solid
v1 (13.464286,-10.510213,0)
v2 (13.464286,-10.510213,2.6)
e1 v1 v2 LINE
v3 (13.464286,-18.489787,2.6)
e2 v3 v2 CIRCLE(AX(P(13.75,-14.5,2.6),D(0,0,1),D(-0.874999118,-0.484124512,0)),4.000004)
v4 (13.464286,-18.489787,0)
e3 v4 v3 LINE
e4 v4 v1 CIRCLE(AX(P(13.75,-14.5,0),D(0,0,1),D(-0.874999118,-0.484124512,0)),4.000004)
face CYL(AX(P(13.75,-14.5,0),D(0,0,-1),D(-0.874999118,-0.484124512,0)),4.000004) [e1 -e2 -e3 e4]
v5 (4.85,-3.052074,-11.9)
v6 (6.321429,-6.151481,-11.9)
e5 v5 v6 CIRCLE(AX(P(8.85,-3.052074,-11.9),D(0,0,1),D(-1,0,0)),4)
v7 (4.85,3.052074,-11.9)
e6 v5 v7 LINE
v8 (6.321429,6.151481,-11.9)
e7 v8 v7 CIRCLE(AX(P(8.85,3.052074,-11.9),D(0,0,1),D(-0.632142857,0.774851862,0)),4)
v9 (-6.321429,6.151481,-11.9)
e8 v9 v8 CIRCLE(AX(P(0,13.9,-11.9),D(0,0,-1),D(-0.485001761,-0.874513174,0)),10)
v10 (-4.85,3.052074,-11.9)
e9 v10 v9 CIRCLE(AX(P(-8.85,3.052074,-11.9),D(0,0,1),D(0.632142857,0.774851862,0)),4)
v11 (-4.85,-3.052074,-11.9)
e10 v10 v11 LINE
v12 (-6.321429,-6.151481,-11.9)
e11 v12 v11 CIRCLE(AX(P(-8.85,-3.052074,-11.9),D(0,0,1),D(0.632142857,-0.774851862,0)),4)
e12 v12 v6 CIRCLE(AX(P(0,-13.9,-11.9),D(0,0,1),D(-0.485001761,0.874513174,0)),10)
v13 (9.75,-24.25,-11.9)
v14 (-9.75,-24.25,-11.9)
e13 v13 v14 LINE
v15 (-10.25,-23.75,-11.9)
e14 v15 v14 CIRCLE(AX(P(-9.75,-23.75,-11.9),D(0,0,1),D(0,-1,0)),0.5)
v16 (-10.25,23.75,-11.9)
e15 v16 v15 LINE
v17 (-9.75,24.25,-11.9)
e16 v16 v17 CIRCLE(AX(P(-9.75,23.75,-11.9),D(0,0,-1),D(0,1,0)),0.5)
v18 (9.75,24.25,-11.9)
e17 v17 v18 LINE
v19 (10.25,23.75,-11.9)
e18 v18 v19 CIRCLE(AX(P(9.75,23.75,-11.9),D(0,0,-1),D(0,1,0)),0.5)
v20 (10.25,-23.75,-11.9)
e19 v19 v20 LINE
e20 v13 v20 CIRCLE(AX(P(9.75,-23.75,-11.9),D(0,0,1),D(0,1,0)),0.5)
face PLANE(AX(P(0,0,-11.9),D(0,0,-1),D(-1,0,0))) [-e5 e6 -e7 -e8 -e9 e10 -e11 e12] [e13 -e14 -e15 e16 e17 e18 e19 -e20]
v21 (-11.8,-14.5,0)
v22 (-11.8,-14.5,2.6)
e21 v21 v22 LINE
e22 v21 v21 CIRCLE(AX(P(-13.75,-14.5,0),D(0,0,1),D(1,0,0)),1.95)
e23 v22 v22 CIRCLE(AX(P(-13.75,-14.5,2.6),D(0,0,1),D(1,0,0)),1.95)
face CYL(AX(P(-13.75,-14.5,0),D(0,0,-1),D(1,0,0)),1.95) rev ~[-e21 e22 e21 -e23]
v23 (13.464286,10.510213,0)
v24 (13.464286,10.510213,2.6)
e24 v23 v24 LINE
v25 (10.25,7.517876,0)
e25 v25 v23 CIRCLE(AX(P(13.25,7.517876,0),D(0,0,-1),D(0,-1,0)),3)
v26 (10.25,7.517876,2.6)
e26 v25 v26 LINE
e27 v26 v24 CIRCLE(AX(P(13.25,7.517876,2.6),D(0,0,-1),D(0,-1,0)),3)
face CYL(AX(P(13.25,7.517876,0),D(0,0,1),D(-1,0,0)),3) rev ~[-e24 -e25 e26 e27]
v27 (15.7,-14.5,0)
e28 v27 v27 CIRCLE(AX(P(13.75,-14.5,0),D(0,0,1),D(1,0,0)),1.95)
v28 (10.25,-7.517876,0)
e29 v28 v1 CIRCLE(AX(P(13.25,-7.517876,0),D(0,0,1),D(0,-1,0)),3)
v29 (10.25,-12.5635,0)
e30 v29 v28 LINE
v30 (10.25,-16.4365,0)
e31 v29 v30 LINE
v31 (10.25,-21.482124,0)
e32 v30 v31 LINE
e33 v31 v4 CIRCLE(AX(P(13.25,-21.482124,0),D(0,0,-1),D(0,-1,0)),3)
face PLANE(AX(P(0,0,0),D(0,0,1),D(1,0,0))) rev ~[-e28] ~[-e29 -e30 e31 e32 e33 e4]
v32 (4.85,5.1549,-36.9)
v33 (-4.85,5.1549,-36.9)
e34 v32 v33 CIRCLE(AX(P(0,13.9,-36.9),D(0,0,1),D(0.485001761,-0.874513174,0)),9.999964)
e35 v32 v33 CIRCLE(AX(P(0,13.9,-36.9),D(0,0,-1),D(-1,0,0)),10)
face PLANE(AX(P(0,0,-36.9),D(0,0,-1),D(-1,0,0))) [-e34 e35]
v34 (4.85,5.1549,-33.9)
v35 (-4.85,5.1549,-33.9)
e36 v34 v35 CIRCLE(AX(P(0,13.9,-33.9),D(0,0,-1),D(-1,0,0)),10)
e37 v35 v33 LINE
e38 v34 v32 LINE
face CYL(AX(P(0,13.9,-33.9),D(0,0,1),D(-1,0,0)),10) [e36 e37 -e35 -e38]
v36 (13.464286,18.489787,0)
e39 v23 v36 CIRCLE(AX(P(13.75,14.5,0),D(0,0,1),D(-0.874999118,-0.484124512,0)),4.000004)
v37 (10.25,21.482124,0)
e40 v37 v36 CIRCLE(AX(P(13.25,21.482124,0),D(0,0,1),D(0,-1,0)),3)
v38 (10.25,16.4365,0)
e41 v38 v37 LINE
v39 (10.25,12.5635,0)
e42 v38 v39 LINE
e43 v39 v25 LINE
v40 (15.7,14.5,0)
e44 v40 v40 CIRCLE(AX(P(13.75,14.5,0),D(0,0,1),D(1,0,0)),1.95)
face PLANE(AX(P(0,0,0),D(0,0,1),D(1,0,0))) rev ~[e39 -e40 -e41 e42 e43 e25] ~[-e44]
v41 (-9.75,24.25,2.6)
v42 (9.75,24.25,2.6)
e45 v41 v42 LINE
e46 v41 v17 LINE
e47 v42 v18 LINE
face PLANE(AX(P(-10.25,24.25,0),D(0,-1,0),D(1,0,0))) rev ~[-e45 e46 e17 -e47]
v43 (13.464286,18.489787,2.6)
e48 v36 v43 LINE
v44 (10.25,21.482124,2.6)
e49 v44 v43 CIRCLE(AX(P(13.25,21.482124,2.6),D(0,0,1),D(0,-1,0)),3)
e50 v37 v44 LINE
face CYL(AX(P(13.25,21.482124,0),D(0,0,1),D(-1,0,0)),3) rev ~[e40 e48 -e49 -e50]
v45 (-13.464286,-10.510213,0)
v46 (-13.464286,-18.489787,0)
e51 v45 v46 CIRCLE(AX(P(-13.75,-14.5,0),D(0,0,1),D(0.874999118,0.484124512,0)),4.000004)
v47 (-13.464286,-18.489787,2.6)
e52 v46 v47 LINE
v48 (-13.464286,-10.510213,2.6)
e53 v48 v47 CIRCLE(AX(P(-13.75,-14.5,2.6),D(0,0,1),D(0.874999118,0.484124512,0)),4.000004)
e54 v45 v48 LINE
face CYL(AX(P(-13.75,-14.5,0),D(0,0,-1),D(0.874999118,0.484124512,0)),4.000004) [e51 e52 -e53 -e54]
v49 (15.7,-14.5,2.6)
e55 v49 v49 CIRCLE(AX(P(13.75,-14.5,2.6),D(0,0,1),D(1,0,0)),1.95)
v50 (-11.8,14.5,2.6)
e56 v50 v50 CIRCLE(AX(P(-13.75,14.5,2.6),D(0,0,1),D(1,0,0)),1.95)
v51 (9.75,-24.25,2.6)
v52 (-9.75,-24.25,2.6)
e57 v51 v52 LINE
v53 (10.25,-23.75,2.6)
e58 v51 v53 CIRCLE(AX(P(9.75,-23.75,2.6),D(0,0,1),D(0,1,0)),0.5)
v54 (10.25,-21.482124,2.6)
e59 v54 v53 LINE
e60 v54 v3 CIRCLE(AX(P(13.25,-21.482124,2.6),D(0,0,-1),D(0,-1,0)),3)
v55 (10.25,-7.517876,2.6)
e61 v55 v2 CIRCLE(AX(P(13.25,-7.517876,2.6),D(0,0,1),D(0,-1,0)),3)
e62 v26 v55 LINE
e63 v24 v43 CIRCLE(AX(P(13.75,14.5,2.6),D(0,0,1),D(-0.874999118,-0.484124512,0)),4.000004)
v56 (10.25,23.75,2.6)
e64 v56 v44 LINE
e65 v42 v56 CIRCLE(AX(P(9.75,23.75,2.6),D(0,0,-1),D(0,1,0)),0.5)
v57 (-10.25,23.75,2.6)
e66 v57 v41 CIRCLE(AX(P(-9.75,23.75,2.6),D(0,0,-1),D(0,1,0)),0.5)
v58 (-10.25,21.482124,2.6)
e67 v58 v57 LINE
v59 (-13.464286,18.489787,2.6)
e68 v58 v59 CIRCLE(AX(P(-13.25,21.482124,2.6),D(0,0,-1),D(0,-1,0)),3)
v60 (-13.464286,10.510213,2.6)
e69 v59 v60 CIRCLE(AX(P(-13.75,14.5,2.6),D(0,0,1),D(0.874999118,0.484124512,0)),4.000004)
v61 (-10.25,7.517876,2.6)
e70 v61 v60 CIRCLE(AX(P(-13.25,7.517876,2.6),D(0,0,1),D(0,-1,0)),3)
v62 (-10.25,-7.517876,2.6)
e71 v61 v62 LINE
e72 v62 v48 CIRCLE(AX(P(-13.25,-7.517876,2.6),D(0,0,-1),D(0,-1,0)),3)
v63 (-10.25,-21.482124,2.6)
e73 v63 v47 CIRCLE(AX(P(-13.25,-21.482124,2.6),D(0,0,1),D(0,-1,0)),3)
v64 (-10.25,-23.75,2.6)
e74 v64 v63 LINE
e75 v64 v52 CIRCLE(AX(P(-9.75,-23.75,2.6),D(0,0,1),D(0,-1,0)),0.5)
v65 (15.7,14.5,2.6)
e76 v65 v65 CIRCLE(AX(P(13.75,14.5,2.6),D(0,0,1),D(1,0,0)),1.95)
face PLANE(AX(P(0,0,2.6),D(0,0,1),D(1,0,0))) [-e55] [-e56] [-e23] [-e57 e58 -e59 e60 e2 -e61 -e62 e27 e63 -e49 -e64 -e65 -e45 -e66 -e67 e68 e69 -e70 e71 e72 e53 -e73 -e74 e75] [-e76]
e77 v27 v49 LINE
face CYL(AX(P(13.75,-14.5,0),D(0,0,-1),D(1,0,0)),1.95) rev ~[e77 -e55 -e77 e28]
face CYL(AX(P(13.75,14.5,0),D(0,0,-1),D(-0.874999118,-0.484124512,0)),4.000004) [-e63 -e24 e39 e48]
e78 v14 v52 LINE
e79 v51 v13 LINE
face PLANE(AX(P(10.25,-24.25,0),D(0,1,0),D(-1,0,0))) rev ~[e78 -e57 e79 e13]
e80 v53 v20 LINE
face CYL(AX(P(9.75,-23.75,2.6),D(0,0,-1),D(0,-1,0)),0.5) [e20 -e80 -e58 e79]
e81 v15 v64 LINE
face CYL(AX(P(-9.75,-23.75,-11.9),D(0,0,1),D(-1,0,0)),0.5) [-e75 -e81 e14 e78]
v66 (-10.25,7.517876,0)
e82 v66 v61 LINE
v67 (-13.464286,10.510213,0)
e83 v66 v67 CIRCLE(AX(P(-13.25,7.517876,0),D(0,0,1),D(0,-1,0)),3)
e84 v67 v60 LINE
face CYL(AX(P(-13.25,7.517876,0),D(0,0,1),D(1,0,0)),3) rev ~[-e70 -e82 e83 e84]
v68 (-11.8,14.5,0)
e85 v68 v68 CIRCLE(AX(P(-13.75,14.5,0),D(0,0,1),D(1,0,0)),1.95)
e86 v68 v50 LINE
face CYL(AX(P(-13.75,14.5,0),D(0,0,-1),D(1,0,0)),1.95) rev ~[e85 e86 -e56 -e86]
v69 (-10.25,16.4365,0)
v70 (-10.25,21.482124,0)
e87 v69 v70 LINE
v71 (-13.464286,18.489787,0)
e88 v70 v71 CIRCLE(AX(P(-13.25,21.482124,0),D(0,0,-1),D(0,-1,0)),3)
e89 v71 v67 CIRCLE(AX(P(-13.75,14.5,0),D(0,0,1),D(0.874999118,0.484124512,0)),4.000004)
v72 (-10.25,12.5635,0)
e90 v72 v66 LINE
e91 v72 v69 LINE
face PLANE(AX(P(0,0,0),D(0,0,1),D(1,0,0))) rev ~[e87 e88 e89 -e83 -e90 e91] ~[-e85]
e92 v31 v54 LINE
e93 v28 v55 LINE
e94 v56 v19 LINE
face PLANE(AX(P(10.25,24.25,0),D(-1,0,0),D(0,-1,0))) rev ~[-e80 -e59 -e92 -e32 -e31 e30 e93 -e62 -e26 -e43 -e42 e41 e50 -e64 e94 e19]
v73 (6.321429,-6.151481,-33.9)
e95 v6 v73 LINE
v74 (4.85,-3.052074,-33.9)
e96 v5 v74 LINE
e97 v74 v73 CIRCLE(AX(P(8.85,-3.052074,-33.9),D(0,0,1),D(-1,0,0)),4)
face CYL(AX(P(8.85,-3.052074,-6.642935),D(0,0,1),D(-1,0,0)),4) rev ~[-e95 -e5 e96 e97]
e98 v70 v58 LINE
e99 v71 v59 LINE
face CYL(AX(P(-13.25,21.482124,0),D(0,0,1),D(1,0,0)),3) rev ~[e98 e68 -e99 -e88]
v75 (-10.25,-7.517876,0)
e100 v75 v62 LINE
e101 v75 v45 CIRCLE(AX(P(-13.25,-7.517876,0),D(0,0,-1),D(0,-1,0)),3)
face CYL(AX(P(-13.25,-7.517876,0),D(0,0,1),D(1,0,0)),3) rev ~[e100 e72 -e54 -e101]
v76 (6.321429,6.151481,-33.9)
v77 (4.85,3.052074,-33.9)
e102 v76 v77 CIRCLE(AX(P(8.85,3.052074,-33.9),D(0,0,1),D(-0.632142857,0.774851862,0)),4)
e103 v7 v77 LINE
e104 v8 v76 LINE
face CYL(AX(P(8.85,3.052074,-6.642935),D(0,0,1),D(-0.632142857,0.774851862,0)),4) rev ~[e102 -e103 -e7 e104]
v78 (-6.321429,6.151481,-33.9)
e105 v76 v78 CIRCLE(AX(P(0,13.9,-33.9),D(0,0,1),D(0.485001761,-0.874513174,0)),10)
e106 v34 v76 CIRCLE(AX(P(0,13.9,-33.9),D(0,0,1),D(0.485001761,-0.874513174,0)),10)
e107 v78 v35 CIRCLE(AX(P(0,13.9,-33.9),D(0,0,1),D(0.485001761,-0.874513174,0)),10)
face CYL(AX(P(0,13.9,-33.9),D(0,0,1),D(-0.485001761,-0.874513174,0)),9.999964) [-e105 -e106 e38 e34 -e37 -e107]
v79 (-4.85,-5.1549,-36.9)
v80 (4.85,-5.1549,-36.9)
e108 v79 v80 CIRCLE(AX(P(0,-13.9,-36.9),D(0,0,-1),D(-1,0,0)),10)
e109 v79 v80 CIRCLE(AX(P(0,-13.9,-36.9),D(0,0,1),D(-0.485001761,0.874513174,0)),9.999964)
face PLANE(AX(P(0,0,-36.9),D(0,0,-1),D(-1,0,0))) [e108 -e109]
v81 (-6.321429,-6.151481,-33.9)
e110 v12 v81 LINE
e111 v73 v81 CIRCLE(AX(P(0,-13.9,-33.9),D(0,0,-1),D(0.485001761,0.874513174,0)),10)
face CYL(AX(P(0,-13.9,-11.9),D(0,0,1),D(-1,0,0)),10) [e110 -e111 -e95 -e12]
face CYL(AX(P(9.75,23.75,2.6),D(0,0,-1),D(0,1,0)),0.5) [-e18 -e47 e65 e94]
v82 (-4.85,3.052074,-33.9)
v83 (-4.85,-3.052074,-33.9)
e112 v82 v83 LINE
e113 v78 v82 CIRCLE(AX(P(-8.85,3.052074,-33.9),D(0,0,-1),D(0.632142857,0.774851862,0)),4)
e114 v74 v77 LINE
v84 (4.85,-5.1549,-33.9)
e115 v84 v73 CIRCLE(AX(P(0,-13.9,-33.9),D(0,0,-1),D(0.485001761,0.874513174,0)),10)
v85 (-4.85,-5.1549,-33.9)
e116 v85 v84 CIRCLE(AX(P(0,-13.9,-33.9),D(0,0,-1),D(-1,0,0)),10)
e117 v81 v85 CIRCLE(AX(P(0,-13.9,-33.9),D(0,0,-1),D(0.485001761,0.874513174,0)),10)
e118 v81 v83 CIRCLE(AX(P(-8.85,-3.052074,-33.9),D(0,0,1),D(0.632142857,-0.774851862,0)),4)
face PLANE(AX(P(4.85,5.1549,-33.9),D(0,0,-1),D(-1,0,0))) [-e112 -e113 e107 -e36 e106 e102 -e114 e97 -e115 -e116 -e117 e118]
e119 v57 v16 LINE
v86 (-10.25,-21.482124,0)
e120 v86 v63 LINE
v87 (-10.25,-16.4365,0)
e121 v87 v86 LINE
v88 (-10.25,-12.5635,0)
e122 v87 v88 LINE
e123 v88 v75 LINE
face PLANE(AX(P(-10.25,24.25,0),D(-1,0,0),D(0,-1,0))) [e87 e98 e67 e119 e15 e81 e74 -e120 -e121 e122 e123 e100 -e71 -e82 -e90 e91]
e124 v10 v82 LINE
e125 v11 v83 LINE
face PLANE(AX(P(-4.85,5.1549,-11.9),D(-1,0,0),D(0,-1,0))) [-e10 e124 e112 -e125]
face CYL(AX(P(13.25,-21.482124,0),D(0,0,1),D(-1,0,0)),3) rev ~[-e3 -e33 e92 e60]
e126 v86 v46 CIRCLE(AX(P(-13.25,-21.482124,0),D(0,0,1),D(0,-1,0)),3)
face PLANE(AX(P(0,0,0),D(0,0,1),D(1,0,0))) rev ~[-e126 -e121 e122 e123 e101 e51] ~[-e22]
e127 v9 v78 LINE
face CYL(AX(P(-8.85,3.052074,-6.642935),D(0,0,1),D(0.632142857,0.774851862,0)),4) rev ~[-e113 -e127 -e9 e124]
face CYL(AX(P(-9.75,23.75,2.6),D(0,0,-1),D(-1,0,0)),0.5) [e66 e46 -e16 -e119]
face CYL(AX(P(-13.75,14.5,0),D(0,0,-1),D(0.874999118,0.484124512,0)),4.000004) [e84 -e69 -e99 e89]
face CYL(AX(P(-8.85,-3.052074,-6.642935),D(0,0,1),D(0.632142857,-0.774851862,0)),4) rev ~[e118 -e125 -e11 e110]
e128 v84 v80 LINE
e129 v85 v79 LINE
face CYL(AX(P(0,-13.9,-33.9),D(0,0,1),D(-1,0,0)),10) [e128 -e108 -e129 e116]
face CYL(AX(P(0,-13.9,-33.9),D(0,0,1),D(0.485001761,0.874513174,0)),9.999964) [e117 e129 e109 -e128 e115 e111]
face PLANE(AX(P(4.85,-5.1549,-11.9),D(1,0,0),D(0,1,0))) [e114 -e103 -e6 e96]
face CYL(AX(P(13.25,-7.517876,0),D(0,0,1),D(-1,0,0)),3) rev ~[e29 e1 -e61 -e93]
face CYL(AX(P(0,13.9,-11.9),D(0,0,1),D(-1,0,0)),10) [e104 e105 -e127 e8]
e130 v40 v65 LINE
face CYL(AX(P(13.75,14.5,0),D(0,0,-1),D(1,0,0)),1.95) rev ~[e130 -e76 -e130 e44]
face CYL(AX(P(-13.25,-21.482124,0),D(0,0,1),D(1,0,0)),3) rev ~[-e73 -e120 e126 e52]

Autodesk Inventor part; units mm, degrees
ref_plane "YZ Plane" through (0, 0, 0) normal (1, 0, 0) x (0, 1, 0)
ref_plane "XZ Plane" through (0, 0, 0) normal (0, 1, 0) x (-1, 0, 0)
ref_plane "XY Plane" through (0, 0, 0) normal (0, 0, 1) x (1, 0, 0)
sketch "Sketch1" plane through (0, 0, 0) normal (0, 0, 1) x (1, 0, 0)
  line L0 (10.25, 24.25) -> (10.25, -24.25) projected
  line L1 (-10.25, 24.25) -> (10.25, 24.25) projected
  line L2 (-10.25, -24.25) -> (-10.25, -9) projected
  line L3 (-10.25, 9) -> (-10.25, 24.25) projected
  line L4 (10.25, -24.25) -> (-10.25, -24.25) projected
  circle A0 centre (13.75, -14.5) radius 1.95 projected
  circle A1 centre (13.75, 14.5) radius 1.95 projected
  circle A2 centre (-13.75, 14.5) radius 1.95 projected
  circle A3 centre (-13.75, -14.5) radius 1.95 projected
  line L5 (-10.25, 9) -> (-10.25, -9)
  arc A4 (10.25, 12.5635) -> (10.25, 16.4365) centre (13.75, 14.5) ccw
  arc A5 (10.25, -16.4365) -> (10.25, -12.5635) centre (13.75, -14.5) ccw
  arc A6 (-10.25, -12.5635) -> (-10.25, -16.4365) centre (-13.75, -14.5) ccw
  arc A7 (-10.25, 16.4365) -> (-10.25, 12.5635) centre (-13.75, 14.5) ccw
  point P0 (0, 0)
  dimension "d0" = 8
  dimension "d1" = 8
  dimension "d2" = 8
  dimension "d3" = 8
extrude "Extrusion1" add sketch "Sketch1" along normal blind 2.6
sketch "Sketch2" plane through (0, 0, 0) normal (0, 0, -1) x (-1, 0, 0)
  line L0 (10.25, 24.25) -> (10.25, 16.4365) projected
  line L1 (-10.25, -24.25) -> (-10.25, -16.4365) projected
  line L2 (10.25, 24.25) -> (-10.25, 24.25)
  line L3 (-10.25, 24.25) -> (-10.25, -24.25)
  line L4 (-10.25, -24.25) -> (10.25, -24.25)
  line L5 (10.25, -24.25) -> (10.25, 24.25)
  point P0 (0, 0)
extrude "Extrusion2" add sketch "Sketch2" along normal blind 11.9
sketch "Sketch3" plane through (0, 0, -11.9) normal (0, 0, -1) x (-1, 0, 0)
  circle A0 centre (0, 13.9) radius 10 projected
  circle A1 centre (0, -13.9) radius 10 projected
  line L0 (4.85, 5.1549) -> (4.85, -5.1549)
  line L1 (-4.85, -5.1549) -> (-4.85, 5.1549)
  line L2 (-4.85, 7.8675) -> (4.85, -7.8675) construction
  line L3 (4.85, 7.8675) -> (-4.85, -7.8675) construction
  point P0 (0, 0)
  dimension "d8" = 9.7
extrude "Extrusion3" add sketch "Sketch3" along normal blind 22
sketch "Sketch4" plane through (0, 0, -33.9) normal (0, 0, -1) x (-1, 0, 0)
  arc A0 (4.85, 5.1549) -> (-4.85, 5.1549) centre (0, 13.9) ccw projected
  circle A1 centre (0, 13.9) radius 10
  arc A2 (-4.85, -5.1549) -> (4.85, -5.1549) centre (0, -13.9) ccw projected
  circle A3 centre (0, -13.9) radius 10
  point P0 (0, 0)
extrude "Extrusion4" add sketch "Sketch4" along normal blind 3
fillet "Fillet1" radius 4 4 edges at (-4.85, 5.1549, -22.9) (-4.85, -5.1549, -22.9) (4.85, -5.1549, -22.9) (4.85, 5.1549, -22.9)
fillet "Fillet2" radius 3 8 edges at (-10.25, -12.5635, 1.3) (-10.25, -16.4365, 1.3) (-10.25, 16.4365, 1.3) (-10.25, 12.5635, 1.3) (10.25, 12.5635, 1.3) (10.25, 16.4365, 1.3) (10.25, -16.4365, 1.3) (10.25, -12.5635, 1.3)
fillet "Fillet3" radius 0.5 4 edges at (-10.25, -24.25, -4.65) (10.25, -24.25, -4.65) (10.25, 24.25, -4.65) (-10.25, 24.25, -4.65)
properties part number "Side Lidar"
